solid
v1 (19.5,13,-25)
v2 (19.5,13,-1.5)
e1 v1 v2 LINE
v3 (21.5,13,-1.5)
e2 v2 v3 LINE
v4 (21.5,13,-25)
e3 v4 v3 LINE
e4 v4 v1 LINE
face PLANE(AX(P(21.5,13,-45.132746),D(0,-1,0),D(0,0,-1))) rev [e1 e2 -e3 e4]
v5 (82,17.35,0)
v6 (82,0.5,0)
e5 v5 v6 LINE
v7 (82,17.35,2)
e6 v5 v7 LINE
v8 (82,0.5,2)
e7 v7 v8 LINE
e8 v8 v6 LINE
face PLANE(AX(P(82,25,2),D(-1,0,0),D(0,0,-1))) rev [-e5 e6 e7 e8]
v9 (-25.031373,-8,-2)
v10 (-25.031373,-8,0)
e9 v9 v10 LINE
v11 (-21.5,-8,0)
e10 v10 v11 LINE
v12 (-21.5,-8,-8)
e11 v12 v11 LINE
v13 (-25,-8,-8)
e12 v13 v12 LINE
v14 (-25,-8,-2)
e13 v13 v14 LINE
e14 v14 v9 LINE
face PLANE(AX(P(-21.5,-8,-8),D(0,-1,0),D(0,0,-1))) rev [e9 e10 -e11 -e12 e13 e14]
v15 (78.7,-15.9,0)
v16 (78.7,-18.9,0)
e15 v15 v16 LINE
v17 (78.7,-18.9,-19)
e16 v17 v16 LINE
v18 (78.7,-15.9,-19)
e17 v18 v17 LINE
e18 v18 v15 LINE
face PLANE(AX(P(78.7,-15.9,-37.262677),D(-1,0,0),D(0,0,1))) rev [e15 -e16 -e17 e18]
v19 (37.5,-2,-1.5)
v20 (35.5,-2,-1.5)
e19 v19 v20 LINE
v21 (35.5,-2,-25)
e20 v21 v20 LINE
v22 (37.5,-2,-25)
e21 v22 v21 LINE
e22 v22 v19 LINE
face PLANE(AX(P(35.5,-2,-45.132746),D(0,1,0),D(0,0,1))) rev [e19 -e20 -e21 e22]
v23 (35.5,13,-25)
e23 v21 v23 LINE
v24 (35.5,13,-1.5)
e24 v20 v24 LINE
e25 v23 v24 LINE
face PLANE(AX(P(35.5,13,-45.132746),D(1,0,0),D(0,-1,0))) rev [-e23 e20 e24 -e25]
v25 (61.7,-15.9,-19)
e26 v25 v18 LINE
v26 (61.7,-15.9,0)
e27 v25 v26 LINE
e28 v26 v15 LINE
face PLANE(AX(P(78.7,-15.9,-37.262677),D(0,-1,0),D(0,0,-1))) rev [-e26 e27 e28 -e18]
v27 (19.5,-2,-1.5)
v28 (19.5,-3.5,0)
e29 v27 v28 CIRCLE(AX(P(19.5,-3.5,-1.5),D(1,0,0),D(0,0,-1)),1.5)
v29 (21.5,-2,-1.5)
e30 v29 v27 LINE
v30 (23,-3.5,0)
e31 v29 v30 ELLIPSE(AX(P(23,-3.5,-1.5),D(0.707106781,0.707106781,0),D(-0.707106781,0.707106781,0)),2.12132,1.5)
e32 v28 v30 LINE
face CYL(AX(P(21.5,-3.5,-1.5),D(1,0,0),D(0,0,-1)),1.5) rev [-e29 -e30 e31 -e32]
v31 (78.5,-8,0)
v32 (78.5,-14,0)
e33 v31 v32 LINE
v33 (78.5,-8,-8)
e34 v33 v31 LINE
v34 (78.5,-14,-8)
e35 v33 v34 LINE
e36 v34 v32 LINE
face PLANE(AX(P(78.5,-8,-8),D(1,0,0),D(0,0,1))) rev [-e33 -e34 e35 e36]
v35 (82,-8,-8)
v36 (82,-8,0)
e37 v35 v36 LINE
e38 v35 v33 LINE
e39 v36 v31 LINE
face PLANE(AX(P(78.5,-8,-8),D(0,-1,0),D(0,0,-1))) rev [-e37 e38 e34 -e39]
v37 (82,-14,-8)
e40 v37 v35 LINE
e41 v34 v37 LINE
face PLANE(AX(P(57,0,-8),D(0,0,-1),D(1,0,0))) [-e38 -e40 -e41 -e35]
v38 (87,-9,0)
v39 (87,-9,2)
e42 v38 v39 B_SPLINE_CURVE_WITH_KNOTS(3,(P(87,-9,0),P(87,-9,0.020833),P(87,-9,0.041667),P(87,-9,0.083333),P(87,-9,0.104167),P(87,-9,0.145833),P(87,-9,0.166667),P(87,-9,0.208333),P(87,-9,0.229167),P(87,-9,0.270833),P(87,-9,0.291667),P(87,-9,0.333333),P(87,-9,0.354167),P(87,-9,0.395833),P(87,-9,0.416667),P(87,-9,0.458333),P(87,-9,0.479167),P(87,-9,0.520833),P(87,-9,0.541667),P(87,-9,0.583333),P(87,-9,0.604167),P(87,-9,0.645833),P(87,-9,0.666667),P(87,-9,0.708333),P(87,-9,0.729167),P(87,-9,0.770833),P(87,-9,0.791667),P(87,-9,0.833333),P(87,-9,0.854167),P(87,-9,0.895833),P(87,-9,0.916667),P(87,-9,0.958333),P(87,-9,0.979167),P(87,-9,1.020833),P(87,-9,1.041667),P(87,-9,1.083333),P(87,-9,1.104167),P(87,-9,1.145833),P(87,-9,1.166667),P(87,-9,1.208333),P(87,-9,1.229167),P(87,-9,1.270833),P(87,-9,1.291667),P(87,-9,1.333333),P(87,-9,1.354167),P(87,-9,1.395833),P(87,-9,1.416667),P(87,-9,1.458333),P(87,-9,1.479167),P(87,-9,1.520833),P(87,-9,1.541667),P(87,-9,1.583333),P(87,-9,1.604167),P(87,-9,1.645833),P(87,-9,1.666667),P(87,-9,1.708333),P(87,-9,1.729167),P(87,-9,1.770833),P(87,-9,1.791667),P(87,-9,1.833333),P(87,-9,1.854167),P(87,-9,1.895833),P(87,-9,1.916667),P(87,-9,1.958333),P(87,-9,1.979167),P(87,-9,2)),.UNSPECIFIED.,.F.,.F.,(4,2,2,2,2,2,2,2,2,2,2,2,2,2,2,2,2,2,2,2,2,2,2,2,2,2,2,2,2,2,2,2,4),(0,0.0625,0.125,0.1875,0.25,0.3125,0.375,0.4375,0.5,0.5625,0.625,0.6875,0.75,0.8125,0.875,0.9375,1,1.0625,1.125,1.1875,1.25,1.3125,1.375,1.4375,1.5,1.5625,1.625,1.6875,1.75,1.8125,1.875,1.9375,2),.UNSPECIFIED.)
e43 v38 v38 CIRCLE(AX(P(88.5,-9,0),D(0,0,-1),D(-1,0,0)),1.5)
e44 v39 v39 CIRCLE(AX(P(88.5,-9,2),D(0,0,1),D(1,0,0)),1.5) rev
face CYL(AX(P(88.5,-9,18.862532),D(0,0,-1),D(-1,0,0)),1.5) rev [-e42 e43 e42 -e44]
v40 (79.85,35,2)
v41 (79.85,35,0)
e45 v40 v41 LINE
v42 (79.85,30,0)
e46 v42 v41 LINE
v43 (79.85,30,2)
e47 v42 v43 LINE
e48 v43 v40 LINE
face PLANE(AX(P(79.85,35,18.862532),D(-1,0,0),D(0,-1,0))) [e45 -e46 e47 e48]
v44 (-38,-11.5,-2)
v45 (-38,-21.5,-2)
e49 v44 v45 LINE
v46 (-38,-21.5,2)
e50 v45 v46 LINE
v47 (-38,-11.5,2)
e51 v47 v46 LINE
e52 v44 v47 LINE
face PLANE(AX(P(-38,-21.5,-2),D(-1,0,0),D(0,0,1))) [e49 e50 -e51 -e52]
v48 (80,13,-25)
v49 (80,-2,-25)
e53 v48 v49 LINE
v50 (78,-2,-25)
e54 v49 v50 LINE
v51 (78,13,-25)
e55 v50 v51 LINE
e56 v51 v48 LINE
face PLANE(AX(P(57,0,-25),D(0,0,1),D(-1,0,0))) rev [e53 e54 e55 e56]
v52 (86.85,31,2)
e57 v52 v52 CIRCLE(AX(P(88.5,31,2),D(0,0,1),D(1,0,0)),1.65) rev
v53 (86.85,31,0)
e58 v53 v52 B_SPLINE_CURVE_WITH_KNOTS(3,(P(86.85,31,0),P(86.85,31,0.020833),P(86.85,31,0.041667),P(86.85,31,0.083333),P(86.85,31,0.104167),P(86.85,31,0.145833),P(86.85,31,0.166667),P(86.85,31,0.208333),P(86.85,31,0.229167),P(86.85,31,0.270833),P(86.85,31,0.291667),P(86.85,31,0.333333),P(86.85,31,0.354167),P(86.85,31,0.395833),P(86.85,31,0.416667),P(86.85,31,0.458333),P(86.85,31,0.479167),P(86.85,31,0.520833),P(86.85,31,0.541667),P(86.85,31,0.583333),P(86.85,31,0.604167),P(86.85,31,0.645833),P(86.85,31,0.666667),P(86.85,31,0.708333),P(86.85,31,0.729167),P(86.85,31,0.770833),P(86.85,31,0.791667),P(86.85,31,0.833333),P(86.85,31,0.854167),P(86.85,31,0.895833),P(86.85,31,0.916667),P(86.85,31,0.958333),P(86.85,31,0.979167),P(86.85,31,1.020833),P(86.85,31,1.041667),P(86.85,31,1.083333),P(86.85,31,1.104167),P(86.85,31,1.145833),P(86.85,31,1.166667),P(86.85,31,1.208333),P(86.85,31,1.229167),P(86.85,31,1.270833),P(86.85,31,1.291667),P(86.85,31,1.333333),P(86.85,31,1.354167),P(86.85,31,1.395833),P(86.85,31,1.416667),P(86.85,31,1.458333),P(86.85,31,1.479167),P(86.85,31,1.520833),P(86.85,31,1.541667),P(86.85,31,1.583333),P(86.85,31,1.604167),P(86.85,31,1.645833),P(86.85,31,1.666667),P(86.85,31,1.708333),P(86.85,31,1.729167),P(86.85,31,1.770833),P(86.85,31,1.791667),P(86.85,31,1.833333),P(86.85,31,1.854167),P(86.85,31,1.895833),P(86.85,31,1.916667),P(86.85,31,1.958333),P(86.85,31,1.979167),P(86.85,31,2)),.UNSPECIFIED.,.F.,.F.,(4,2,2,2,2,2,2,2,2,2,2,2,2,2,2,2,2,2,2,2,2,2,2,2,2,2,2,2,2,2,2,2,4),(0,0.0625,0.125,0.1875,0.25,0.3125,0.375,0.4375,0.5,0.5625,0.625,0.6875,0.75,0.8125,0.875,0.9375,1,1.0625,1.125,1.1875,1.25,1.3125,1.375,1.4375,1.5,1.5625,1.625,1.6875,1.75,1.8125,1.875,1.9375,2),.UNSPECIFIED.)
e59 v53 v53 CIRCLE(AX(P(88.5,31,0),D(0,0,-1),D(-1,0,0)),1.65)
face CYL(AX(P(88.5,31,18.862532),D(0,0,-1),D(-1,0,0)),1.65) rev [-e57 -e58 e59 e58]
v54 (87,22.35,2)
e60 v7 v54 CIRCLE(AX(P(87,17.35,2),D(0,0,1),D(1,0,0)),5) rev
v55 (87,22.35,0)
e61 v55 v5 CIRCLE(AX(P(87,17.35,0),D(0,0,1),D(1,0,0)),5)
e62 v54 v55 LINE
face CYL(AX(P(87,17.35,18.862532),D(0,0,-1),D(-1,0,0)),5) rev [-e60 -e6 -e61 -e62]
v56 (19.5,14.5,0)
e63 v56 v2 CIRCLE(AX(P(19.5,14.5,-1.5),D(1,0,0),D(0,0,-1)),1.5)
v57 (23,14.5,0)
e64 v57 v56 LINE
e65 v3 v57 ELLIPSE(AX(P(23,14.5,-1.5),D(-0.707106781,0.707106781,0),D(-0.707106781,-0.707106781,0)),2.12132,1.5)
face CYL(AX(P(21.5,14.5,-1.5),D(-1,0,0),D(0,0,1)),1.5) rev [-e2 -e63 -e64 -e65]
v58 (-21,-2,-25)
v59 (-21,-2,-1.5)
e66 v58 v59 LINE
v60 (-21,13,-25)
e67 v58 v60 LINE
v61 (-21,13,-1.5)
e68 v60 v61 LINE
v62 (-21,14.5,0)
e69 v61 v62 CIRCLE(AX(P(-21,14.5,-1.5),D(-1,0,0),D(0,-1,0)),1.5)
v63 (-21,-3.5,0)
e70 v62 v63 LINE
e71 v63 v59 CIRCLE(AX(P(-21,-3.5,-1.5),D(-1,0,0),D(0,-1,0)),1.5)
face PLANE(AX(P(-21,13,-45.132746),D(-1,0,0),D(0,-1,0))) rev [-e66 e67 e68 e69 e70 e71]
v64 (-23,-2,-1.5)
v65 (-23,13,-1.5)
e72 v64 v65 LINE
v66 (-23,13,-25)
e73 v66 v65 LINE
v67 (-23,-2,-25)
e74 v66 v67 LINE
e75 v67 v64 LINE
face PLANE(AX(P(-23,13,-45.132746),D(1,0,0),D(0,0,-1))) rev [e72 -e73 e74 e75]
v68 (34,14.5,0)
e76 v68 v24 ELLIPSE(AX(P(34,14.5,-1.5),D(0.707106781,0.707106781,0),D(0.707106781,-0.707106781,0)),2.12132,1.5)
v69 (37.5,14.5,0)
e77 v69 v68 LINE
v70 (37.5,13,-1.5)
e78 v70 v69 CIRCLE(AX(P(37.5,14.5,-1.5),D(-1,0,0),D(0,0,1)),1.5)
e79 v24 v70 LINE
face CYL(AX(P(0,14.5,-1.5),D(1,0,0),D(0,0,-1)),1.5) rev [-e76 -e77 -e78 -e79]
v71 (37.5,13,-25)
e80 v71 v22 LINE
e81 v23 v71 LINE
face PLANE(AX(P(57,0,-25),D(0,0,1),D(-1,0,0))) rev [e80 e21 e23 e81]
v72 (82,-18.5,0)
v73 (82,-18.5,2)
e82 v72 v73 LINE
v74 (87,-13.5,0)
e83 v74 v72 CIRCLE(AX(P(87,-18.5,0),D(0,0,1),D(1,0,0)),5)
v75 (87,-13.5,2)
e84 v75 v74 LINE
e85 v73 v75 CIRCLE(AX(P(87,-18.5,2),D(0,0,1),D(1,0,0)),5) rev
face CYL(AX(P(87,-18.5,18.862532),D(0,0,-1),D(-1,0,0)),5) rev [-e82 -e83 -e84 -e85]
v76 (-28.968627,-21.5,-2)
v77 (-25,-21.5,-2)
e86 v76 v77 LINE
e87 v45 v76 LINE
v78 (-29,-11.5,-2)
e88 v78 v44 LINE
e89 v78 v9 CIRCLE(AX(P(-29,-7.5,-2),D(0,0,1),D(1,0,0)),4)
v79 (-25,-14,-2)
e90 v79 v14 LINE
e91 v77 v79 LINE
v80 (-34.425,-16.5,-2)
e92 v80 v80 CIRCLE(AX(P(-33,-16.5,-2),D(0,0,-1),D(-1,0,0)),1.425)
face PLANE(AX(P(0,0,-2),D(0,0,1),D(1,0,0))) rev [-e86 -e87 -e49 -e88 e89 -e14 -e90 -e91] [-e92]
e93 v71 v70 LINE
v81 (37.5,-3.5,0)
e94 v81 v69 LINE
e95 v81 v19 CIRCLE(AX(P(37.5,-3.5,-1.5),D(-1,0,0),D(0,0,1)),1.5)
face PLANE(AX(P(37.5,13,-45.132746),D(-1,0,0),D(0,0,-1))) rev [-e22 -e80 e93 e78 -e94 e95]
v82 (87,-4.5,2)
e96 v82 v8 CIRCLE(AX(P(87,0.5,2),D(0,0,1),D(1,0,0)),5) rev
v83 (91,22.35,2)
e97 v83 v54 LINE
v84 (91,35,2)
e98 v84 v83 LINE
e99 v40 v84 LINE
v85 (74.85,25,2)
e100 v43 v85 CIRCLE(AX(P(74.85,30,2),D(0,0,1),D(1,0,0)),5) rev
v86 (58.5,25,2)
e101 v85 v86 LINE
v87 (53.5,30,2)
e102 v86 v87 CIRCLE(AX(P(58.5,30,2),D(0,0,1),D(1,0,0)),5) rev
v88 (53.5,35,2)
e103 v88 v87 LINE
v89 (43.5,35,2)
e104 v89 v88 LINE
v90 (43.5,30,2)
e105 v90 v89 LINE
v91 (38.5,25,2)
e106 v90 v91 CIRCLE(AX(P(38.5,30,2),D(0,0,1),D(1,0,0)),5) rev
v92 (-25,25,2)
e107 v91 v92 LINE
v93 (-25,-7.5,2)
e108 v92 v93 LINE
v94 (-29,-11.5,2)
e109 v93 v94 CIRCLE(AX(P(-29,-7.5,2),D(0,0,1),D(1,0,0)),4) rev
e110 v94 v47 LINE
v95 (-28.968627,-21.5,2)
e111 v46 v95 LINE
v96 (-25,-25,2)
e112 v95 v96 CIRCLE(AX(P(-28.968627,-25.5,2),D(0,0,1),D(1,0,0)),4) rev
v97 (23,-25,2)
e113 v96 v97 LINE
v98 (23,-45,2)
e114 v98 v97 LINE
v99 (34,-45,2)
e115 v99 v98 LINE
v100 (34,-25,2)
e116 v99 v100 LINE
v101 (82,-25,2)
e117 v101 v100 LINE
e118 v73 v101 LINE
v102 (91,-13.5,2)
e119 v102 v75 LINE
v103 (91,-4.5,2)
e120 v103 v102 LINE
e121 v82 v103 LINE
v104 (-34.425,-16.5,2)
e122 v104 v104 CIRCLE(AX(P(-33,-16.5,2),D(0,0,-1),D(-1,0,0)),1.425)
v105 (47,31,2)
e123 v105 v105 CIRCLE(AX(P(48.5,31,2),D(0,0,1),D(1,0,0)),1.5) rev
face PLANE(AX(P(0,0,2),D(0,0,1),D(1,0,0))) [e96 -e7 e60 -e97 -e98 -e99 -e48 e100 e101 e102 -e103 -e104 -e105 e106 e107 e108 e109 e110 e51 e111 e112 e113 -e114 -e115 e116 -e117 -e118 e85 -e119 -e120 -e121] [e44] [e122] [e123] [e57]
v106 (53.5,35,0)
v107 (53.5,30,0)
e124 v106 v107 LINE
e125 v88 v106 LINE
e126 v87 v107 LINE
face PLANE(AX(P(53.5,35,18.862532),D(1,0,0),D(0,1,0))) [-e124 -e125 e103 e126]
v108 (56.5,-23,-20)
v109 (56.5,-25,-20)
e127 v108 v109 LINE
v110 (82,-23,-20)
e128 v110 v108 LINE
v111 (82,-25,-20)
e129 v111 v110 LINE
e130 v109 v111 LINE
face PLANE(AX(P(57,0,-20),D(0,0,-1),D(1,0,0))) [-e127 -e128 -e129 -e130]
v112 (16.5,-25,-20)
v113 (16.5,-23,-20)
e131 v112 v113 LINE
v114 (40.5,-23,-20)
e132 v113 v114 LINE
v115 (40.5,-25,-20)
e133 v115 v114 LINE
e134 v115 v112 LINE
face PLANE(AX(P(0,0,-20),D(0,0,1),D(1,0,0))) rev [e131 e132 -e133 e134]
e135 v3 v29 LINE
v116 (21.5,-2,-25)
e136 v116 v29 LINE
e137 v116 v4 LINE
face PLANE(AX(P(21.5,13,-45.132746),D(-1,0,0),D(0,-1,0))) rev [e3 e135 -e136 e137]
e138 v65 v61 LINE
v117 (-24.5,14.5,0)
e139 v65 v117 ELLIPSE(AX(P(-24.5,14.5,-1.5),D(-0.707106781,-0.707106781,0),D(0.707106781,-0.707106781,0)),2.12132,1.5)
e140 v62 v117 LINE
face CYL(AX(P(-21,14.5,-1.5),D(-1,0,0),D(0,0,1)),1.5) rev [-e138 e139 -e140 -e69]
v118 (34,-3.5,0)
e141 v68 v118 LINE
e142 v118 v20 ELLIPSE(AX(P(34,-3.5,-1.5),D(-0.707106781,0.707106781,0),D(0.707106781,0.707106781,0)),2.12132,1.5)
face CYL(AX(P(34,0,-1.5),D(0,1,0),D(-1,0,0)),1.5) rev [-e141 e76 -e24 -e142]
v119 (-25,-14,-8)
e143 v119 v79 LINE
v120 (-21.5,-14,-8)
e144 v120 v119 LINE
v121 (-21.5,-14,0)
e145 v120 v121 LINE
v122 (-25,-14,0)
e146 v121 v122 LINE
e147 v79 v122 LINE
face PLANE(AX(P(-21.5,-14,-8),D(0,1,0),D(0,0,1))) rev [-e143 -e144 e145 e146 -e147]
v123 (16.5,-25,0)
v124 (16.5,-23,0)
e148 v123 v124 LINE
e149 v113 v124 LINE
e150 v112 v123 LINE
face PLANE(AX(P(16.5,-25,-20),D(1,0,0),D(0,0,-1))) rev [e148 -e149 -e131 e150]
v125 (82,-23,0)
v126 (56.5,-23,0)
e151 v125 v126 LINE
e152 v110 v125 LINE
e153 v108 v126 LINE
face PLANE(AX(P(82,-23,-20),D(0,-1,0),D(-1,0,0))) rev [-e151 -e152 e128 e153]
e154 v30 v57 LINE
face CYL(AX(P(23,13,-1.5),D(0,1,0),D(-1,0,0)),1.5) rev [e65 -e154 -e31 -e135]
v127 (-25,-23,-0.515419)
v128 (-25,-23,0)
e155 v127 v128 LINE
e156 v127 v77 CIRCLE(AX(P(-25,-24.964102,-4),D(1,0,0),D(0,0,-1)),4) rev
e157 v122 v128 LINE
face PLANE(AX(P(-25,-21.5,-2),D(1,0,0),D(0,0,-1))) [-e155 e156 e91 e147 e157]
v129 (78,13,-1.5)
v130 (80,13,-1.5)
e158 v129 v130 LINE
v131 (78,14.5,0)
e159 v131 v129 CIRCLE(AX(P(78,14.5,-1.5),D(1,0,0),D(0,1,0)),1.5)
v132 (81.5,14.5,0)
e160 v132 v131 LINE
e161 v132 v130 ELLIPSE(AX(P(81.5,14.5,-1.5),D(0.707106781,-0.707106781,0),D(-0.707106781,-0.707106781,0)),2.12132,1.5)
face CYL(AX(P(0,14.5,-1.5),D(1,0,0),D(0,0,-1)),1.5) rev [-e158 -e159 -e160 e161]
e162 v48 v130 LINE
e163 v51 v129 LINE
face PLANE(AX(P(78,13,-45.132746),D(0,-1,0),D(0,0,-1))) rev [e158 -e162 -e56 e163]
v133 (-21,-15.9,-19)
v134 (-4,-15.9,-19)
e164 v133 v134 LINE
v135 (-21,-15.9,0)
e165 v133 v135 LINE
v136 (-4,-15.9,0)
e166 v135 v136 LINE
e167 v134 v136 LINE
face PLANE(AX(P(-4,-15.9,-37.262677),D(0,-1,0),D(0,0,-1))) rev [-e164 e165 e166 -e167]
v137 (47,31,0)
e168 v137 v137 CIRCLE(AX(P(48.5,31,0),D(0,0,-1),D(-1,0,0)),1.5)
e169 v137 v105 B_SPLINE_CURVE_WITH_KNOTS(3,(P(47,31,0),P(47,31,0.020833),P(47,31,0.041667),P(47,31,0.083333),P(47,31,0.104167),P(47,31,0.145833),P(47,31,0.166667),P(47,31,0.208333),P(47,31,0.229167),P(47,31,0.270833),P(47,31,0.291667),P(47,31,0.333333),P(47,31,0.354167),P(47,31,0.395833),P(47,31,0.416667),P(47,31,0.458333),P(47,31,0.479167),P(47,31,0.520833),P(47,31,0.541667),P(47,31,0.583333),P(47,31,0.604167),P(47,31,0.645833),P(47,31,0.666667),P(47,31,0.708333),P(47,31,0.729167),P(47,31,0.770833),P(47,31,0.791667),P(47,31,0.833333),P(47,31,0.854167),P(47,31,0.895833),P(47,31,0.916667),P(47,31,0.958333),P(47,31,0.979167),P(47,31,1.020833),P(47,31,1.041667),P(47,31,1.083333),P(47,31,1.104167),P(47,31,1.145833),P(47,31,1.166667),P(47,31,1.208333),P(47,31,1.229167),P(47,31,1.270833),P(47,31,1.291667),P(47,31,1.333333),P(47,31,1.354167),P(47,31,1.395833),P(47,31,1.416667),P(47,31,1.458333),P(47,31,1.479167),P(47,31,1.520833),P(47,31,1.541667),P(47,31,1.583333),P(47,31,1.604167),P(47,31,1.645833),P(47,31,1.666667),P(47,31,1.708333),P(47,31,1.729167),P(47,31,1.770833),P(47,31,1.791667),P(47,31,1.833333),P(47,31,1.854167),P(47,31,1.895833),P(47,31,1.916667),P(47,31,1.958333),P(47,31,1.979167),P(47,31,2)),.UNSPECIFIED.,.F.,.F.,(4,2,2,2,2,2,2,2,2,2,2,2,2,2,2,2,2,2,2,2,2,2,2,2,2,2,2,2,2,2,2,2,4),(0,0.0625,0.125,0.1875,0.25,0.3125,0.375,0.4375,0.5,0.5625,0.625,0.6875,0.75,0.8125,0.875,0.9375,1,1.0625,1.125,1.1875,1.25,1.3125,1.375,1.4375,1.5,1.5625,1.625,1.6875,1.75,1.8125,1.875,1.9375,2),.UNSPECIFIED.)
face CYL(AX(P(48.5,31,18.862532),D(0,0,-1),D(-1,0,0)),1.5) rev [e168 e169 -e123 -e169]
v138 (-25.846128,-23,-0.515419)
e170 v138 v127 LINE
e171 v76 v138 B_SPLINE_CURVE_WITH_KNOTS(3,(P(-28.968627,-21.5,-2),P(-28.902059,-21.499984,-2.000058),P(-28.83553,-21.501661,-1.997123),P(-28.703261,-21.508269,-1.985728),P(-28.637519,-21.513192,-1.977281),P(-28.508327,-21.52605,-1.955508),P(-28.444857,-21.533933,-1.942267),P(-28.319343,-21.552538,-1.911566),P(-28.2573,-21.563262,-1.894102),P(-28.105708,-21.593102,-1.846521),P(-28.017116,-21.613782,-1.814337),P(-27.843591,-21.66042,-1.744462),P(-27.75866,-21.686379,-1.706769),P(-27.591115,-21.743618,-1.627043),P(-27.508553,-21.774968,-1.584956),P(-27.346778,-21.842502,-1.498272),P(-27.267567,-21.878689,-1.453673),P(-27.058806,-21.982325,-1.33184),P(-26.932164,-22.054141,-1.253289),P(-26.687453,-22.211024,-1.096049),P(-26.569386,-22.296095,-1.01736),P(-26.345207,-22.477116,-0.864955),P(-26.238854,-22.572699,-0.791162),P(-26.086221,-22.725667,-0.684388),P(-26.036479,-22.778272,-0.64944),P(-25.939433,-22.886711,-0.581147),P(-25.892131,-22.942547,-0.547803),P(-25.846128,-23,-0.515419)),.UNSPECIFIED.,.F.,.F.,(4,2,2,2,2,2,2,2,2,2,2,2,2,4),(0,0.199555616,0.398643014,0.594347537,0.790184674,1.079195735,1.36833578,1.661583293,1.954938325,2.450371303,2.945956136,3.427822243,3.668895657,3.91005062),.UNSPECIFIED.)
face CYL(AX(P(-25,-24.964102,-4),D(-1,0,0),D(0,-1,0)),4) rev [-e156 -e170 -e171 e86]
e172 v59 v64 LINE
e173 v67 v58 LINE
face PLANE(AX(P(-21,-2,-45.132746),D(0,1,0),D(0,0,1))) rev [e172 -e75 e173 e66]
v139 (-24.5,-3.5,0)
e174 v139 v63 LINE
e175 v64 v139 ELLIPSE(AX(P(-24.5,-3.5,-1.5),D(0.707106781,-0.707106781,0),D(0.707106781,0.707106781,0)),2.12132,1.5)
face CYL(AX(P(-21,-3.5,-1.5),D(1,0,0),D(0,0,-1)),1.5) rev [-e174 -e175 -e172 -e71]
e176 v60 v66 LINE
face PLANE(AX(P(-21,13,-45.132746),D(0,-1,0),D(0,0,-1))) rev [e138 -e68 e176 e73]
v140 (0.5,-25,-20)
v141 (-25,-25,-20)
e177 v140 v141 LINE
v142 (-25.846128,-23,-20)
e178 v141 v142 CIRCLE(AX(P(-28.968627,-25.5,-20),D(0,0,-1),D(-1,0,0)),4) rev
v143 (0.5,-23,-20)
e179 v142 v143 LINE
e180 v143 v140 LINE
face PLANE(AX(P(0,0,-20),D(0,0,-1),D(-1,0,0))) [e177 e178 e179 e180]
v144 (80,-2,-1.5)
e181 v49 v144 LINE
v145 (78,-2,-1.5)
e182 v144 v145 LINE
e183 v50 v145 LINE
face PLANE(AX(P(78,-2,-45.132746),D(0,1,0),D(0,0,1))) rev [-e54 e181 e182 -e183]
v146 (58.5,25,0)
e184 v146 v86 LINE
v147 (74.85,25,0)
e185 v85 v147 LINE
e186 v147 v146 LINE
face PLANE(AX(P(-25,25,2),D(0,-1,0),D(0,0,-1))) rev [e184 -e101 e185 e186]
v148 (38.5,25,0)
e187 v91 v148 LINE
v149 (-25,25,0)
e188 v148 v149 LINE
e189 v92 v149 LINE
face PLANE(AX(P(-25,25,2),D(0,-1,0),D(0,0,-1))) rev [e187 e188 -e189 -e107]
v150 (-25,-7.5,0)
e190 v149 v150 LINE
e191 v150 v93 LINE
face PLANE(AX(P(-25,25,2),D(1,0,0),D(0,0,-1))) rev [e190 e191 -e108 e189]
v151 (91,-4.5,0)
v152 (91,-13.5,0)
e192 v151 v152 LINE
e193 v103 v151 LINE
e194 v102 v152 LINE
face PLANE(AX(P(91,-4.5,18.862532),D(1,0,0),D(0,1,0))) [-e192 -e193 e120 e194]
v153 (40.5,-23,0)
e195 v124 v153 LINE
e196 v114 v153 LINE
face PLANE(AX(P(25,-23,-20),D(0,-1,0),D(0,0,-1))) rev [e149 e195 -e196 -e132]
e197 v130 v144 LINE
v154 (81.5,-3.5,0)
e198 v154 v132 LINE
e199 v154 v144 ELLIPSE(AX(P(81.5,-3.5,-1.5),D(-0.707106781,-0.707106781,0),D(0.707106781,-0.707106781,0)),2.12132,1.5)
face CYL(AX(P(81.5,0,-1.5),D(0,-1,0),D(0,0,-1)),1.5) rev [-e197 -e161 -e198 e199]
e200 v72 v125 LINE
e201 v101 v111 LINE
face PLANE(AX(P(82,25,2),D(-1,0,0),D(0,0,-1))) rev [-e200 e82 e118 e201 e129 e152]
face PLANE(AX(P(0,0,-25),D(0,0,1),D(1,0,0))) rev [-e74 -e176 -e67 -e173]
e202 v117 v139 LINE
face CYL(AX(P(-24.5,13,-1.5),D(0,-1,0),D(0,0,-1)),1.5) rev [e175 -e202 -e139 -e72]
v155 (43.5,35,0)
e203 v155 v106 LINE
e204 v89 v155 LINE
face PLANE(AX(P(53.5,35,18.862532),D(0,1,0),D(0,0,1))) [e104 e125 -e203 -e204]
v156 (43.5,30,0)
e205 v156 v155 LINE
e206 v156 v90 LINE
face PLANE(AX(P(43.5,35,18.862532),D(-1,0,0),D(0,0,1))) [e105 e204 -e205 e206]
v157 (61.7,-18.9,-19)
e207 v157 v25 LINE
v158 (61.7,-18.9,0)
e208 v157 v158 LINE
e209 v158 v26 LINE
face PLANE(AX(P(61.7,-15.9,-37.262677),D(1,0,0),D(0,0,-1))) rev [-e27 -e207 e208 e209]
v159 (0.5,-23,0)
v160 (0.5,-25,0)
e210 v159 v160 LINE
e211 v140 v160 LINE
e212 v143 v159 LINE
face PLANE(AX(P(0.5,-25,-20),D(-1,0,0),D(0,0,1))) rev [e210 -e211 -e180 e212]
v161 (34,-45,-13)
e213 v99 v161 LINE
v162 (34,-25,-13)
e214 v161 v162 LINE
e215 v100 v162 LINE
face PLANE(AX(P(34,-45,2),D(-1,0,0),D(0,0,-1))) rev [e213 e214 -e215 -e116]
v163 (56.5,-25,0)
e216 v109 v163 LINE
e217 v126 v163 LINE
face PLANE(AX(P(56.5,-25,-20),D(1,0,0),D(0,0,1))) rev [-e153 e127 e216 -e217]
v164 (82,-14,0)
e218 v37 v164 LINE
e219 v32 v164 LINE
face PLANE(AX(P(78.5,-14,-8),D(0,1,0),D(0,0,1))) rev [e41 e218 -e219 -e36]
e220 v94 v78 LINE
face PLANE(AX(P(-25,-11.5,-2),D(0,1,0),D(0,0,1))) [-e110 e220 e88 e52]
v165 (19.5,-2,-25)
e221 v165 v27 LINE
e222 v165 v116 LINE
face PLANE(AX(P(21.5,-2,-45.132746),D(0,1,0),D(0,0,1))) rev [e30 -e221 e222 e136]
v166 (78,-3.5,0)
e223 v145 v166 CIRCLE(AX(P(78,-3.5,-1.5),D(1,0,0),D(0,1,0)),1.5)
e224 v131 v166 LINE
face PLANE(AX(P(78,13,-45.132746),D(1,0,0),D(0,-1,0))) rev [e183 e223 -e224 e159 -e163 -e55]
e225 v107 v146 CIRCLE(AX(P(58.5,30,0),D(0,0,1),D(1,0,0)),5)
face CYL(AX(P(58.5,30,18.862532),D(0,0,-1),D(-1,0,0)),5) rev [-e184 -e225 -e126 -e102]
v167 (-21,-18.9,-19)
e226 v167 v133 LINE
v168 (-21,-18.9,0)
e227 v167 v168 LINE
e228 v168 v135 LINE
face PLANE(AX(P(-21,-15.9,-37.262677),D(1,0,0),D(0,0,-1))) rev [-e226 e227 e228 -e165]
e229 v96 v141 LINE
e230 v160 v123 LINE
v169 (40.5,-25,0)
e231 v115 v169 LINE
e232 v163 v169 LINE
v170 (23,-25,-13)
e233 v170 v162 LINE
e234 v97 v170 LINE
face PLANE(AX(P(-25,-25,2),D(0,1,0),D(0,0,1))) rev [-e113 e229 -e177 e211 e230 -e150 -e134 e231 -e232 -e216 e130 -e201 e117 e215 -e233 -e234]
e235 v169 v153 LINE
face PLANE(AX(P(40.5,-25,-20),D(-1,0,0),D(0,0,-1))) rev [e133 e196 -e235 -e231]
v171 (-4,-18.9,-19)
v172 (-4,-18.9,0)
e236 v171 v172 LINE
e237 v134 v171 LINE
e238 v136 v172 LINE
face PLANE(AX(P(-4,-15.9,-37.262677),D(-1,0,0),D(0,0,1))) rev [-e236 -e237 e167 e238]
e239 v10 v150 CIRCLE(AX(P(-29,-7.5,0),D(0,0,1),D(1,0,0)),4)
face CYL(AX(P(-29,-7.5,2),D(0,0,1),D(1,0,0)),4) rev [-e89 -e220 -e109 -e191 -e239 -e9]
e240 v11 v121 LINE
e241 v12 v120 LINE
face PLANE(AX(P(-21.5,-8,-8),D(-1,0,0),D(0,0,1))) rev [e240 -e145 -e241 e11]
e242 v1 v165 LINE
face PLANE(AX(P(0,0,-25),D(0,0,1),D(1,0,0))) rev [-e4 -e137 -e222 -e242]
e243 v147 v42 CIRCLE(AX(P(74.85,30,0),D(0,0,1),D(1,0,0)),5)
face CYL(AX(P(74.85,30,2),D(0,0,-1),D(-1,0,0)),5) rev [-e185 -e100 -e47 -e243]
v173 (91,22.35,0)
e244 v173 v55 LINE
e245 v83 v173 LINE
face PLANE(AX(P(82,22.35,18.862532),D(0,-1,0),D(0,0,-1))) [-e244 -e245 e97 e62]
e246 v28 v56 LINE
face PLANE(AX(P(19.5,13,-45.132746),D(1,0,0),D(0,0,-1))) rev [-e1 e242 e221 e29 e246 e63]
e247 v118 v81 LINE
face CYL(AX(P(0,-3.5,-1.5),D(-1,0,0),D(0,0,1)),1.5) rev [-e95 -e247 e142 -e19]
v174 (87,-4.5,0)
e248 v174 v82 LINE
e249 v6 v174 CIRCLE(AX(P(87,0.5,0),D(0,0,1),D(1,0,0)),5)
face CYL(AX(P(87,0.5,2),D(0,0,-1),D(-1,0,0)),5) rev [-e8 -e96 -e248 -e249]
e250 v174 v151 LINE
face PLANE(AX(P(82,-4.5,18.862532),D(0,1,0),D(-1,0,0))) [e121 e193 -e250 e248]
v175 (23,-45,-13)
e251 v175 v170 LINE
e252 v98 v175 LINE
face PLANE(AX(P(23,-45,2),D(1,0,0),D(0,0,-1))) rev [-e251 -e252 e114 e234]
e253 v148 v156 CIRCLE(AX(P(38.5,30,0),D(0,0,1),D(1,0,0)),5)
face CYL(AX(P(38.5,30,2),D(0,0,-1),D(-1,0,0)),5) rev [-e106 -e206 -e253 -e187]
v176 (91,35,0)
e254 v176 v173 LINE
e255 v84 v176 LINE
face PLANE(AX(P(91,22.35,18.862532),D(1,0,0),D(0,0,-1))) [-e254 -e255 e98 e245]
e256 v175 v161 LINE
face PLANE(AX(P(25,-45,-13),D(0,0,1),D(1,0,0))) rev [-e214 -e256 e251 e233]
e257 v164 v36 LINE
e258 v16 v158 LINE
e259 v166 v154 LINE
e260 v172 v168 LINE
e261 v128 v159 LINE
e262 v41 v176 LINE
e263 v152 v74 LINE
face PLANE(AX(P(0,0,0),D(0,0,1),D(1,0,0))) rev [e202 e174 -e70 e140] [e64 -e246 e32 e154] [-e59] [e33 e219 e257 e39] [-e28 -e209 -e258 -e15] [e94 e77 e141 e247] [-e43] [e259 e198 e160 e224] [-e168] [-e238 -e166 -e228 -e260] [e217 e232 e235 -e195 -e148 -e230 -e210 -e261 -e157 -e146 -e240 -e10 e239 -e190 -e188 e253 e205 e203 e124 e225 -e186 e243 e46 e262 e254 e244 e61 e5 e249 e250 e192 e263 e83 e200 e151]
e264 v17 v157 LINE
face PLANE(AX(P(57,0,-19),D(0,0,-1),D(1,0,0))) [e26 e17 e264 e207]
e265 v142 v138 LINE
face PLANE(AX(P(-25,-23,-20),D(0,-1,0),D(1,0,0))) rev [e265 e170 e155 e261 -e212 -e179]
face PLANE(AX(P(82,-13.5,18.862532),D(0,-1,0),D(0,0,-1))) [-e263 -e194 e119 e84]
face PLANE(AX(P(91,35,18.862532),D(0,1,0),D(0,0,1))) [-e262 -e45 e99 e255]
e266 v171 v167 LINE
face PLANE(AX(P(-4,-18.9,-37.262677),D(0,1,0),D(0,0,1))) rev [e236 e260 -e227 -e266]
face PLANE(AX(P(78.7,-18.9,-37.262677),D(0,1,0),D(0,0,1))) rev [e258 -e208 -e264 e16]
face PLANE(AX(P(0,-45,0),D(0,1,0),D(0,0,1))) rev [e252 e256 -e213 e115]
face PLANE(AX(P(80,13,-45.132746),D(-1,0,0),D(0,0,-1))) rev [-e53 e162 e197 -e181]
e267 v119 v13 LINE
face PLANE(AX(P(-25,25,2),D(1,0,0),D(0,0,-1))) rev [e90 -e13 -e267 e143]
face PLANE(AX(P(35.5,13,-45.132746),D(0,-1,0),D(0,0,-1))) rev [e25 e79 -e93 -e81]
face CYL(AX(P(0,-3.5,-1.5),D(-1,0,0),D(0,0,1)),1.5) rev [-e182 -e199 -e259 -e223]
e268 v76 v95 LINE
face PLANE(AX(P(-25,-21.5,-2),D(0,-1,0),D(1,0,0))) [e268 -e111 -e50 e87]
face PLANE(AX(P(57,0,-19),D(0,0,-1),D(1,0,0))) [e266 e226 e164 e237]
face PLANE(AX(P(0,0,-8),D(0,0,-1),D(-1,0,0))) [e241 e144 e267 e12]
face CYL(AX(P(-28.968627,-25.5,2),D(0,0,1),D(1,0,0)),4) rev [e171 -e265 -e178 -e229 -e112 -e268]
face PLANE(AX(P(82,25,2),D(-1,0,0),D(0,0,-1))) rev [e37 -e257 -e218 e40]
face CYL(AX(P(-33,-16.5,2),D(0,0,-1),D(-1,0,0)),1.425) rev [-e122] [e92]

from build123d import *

# Parameters (mm, degrees)
SKETCH1_W            = 50
SKETCH1_H            = 50
BOSS_EXTRUDE1_DEPTH  = 2
SKETCH2_W            = 8.5
SKETCH2_H            = 2
SKETCH2_W_2          = 25.5
BOSS_EXTRUDE2_DEPTH  = 20
SKETCH3_W            = 2
SKETCH3_H            = 15
BOSS_EXTRUDE3_DEPTH  = 20
SKETCH5_W            = 2
SKETCH5_H            = 15
BOSS_EXTRUDE5_DEPTH  = 25
SKETCH8_W            = 3.5
SKETCH8_H            = 6
BOSS_EXTRUDE7_DEPTH  = 8
BOSS_EXTRUDE8_DEPTH  = 3.5
SKETCH10_W           = 9
SKETCH10_H           = 9
SKETCH10_R           = 1.5
SKETCH10_R_2         = 1.65
SKETCH10_W_2         = 10
SKETCH10_H_2         = 10
BOSS_EXTRUDE9_DEPTH  = 2
FILLET1_R            = 5
SKETCH11_W           = 17
SKETCH11_H           = 3
BOSS_EXTRUDE10_DEPTH = 19
FILLET2_R            = 1.5
SKETCH12_W           = 13
SKETCH12_H           = 10
BOSS_EXTRUDE11_DEPTH = 4
FILLET3_START        = -2
FILLET3_DEPTH        = 4
FILLET3_START_2      = -20
FILLET3_2_DEPTH      = 18.41096
FILLET3_3_DEPTH      = 2
SKETCH13_R           = 1.425
CUT_EXTRUDE1_DEPTH   = 105.091306073
FILLET4_START        = -2.000000956
FILLET4_DEPTH        = 4.000000956
FILLET4_START_2      = -30
FILLET4_2_DEPTH      = 5


with BuildPart() as part:
    # Sketch1 → Boss-Extrude1 (new body)
    with BuildSketch(Plane.XY):
        Rectangle(SKETCH1_W, SKETCH1_H)
    extrude(amount=BOSS_EXTRUDE1_DEPTH)

    # Sketch2 → Boss-Extrude2 (add)
    with BuildSketch(Plane(origin=(0, 0, 0), x_dir=(-1, 0, 0), z_dir=(0, 0, -1))):
        with Locations((-20.75, -24)):
            Rectangle(SKETCH2_W, SKETCH2_H)
        with Locations((12.25, -24)):
            Rectangle(SKETCH2_W_2, SKETCH2_H)
    extrude(amount=BOSS_EXTRUDE2_DEPTH)

    # Sketch3 → Boss-Extrude3 (add)
    with BuildSketch(Plane.XZ.offset(25)):
        with Locations((24, -5.5)):
            Rectangle(SKETCH3_W, SKETCH3_H)
    extrude(amount=BOSS_EXTRUDE3_DEPTH)

    # Sketch5 → Boss-Extrude5 (add)
    with BuildSketch(Plane(origin=(0, 0, 0), x_dir=(-1, 0, 0), z_dir=(0, 0, -1))):
        with Locations((-20.5, 5.5)):
            Rectangle(SKETCH5_W, SKETCH5_H)
        with Locations((22, 5.5)):
            Rectangle(SKETCH5_W, SKETCH5_H)
    extrude(amount=BOSS_EXTRUDE5_DEPTH)

    # Sketch8 → Boss-Extrude7 (add)
    with BuildSketch(Plane(origin=(0, 0, 0), x_dir=(-1, 0, 0), z_dir=(0, 0, -1))):
        with Locations((23.25, -11)):
            Rectangle(SKETCH8_W, SKETCH8_H)
    extrude(amount=BOSS_EXTRUDE7_DEPTH)

    # Sketch9 → Boss-Extrude8 (add)
    with BuildSketch(Plane(origin=(25, 0, 0), x_dir=(0, 0, -1), z_dir=(1, 0, 0))):
        Polygon((-2, 25), (0, 25), (0, -23), (20, -23), (20, -25), (13, -25), (13, -45), (-2, -45), align=None)
    extrude(amount=BOSS_EXTRUDE8_DEPTH)

    # Mirror1: part across plane


with BuildPart() as part_1:
    add(part.part)
    add(part.part.mirror(Plane.ZY.offset(-28.5)))

    # Sketch10 → Boss-Extrude9 (add)
    # profile 1 of 3: a face of its own
    with BuildSketch(Plane(origin=(0, 0, 0), x_dir=(-1, 0, 0), z_dir=(0, 0, -1))):
        with Locations((-86.5, -9)):
            Rectangle(SKETCH10_W, SKETCH10_H)
        with Locations((-88.5, -9)):
            Circle(SKETCH10_R, mode=Mode.SUBTRACT)
    # profile 2 of 3: a face of its own
    with BuildSketch(Plane(origin=(0, 0, 0), x_dir=(-1, 0, 0), z_dir=(0, 0, -1))):
        Polygon((-79.85, 35), (-79.85, 25), (-82, 25), (-82, 22.35), (-91, 22.35), (-91, 35), align=None)
        with Locations((-88.5, 31)):
            Circle(SKETCH10_R_2, mode=Mode.SUBTRACT)
    # profile 3 of 3: a face of its own
    with BuildSketch(Plane(origin=(0, 0, 0), x_dir=(-1, 0, 0), z_dir=(0, 0, -1))):
        with Locations((-48.5, 30)):
            Rectangle(SKETCH10_W_2, SKETCH10_H_2)
        with Locations((-48.5, 31)):
            Circle(SKETCH10_R, mode=Mode.SUBTRACT)
    extrude(amount=-BOSS_EXTRUDE9_DEPTH)

    # Fillet1
    # the kernel refuses this fillet: 5 mm, written as the material it adds along each edge
    with BuildSketch(Plane(origin=(82, -4.5, 0), x_dir=(0, 1, 0), z_dir=(0, 0, 1)), Plane(origin=(79.85, 25, 0), x_dir=(-1, 0, 0), z_dir=(0, 0, 1)), Plane(origin=(43.5, 25, 0), x_dir=(-1, 0, 0), z_dir=(0, 0, 1))) as fillet1_piece_1:
        with BuildLine():
            CenterArc((FILLET1_R, -FILLET1_R), FILLET1_R, 90, 90)
            Line((0, -FILLET1_R), (0, 0))
            Line((0, 0), (FILLET1_R, 0))
        make_face()
    extrude(amount=2)
    with BuildSketch(Plane(origin=(82, -13.5, 0), x_dir=(0, -1, 0), z_dir=(0, 0, 1)), Plane(origin=(82, 22.35, 0), x_dir=(0, -1, 0), z_dir=(0, 0, 1)), Plane(origin=(53.5, 25, 0), x_dir=(1, 0, 0), z_dir=(0, 0, 1))) as fillet1_piece_2:
        with BuildLine():
            CenterArc((FILLET1_R, FILLET1_R), FILLET1_R, 180, 90)
            Line((0, FILLET1_R), (0, 0))
            Line((0, 0), (FILLET1_R, 0))
        make_face()
    extrude(amount=2)

    # Sketch11 → Boss-Extrude10 (add)
    with BuildSketch(Plane(origin=(0, 0, 0), x_dir=(-1, 0, 0), z_dir=(0, 0, -1))):
        with Locations((-70.2, -17.4)):
            Rectangle(SKETCH11_W, SKETCH11_H)
        with Locations((12.5, -17.4)):
            Rectangle(SKETCH11_W, SKETCH11_H)
    extrude(amount=BOSS_EXTRUDE10_DEPTH)

    # Fillet2
    fillet2_edges = [part_1.edges().sort_by_distance(p)[0] for p in [
        (79, 13, 0),
        (79, -2, 0),
        (80, 5.5, 0),
        (36.5, 13, 0),
        (35.5, 5.5, 0),
        (36.5, -2, 0),
        (20.5, 13, 0),
        (20.5, -2, 0),
        (21.5, 5.5, 0),
        (-22, 13, 0),
        (-23, 5.5, 0),
        (-22, -2, 0),
    ]]
    fillet(fillet2_edges, radius=FILLET2_R)

    # Sketch12 → Boss-Extrude11 (add)
    with BuildSketch(Plane.XY.offset(2)):
        with Locations((-31.5, -16.5)):
            Rectangle(SKETCH12_W, SKETCH12_H)
    extrude(amount=-BOSS_EXTRUDE11_DEPTH)

    # Fillet3: read off the stored shape, not the designer's step
    # Fillet3 outline → Fillet3 (add)
    with BuildSketch(Plane.XY.offset(FILLET3_START)):
        with BuildLine():
            ThreePointArc((-25.846127967, -23), (-25.284740857, -23.941480467), (-25, -25))
            Line((-25, -25), (-25, -23))
            Line((-25, -23), (-25.846127967, -23))
        make_face()
        with BuildLine():
            ThreePointArc((-25.031373033, -8), (-26.354248689, -10.5), (-29, -11.5))
            Line((-29, -11.5), (-25, -11.5))
            Line((-25, -11.5), (-25, -8))
            Line((-25, -8), (-25.031373033, -8))
        make_face()
    extrude(amount=FILLET3_DEPTH)

    # Fillet3 2 outline → Fillet3 2 (add)
    with BuildSketch(Plane.XY.offset(FILLET3_START_2)):
        with BuildLine():
            ThreePointArc((-25.846127967, -23), (-25.284740857, -23.941480467), (-25, -25))
            Line((-25, -25), (-25, -23))
            Line((-25, -23), (-25.846127967, -23))
        make_face()
    extrude(amount=FILLET3_2_DEPTH)

    # Fillet3 3 outline → Fillet3 3 (add)
    with BuildSketch(Plane.XY):
        with BuildLine():
            ThreePointArc((-28.968626967, -21.5), (-27.236576159, -21.894448725), (-25.846127967, -23))
            Line((-25.846127967, -23), (-25, -23))
            Line((-25, -23), (-25, -21.5))
            Line((-25, -21.5), (-28.968626967, -21.5))
        make_face()
        with BuildLine():
            ThreePointArc((-25, -7.5), (-25.007850963, -7.75049165), (-25.031373033, -8))
            Line((-25.031373033, -8), (-25, -8))
            Line((-25, -8), (-25, -7.5))
        make_face()
    extrude(amount=FILLET3_3_DEPTH)

    # Sketch13 → Cut-Extrude1 (cut, through all)
    with BuildSketch(Plane(origin=(0, 0, -2), x_dir=(-1, 0, 0), z_dir=(0, 0, -1))):
        with Locations((33, -16.5)):
            Circle(SKETCH13_R)
    extrude(amount=-CUT_EXTRUDE1_DEPTH, mode=Mode.SUBTRACT)

    # Fillet4: read off the stored shape, not the designer's step
    # Fillet4 outline → Fillet4 (add)
    with BuildSketch(Plane.XY.offset(FILLET4_START)):
        with BuildLine():
            Line((-25.846127967, -23), (-25, -23))
            Line((-25, -23), (-25, -21.5))
            Line((-25, -21.5), (-28.968626967, -21.5))
            ThreePointArc((-28.968626967, -21.5), (-27.236576159, -21.894448725), (-25.846127967, -23))
        make_face()
    extrude(amount=FILLET4_DEPTH)

    # Fillet4 2 outline → Fillet4 2 (cut)
    with BuildSketch(Plane.YZ.offset(FILLET4_START_2)):
        with BuildLine():
            ThreePointArc((-21.499991299, -2.000015071), (-22.150318116, -1.157004674), (-23, -0.515418986))
            Line((-23, -0.515418986), (-23, -2.000000956))
            Line((-23, -2.000000956), (-21.499991299, -2.000015071))
        make_face()
    extrude(amount=FILLET4_2_DEPTH, mode=Mode.SUBTRACT)


solid = part_1.part
